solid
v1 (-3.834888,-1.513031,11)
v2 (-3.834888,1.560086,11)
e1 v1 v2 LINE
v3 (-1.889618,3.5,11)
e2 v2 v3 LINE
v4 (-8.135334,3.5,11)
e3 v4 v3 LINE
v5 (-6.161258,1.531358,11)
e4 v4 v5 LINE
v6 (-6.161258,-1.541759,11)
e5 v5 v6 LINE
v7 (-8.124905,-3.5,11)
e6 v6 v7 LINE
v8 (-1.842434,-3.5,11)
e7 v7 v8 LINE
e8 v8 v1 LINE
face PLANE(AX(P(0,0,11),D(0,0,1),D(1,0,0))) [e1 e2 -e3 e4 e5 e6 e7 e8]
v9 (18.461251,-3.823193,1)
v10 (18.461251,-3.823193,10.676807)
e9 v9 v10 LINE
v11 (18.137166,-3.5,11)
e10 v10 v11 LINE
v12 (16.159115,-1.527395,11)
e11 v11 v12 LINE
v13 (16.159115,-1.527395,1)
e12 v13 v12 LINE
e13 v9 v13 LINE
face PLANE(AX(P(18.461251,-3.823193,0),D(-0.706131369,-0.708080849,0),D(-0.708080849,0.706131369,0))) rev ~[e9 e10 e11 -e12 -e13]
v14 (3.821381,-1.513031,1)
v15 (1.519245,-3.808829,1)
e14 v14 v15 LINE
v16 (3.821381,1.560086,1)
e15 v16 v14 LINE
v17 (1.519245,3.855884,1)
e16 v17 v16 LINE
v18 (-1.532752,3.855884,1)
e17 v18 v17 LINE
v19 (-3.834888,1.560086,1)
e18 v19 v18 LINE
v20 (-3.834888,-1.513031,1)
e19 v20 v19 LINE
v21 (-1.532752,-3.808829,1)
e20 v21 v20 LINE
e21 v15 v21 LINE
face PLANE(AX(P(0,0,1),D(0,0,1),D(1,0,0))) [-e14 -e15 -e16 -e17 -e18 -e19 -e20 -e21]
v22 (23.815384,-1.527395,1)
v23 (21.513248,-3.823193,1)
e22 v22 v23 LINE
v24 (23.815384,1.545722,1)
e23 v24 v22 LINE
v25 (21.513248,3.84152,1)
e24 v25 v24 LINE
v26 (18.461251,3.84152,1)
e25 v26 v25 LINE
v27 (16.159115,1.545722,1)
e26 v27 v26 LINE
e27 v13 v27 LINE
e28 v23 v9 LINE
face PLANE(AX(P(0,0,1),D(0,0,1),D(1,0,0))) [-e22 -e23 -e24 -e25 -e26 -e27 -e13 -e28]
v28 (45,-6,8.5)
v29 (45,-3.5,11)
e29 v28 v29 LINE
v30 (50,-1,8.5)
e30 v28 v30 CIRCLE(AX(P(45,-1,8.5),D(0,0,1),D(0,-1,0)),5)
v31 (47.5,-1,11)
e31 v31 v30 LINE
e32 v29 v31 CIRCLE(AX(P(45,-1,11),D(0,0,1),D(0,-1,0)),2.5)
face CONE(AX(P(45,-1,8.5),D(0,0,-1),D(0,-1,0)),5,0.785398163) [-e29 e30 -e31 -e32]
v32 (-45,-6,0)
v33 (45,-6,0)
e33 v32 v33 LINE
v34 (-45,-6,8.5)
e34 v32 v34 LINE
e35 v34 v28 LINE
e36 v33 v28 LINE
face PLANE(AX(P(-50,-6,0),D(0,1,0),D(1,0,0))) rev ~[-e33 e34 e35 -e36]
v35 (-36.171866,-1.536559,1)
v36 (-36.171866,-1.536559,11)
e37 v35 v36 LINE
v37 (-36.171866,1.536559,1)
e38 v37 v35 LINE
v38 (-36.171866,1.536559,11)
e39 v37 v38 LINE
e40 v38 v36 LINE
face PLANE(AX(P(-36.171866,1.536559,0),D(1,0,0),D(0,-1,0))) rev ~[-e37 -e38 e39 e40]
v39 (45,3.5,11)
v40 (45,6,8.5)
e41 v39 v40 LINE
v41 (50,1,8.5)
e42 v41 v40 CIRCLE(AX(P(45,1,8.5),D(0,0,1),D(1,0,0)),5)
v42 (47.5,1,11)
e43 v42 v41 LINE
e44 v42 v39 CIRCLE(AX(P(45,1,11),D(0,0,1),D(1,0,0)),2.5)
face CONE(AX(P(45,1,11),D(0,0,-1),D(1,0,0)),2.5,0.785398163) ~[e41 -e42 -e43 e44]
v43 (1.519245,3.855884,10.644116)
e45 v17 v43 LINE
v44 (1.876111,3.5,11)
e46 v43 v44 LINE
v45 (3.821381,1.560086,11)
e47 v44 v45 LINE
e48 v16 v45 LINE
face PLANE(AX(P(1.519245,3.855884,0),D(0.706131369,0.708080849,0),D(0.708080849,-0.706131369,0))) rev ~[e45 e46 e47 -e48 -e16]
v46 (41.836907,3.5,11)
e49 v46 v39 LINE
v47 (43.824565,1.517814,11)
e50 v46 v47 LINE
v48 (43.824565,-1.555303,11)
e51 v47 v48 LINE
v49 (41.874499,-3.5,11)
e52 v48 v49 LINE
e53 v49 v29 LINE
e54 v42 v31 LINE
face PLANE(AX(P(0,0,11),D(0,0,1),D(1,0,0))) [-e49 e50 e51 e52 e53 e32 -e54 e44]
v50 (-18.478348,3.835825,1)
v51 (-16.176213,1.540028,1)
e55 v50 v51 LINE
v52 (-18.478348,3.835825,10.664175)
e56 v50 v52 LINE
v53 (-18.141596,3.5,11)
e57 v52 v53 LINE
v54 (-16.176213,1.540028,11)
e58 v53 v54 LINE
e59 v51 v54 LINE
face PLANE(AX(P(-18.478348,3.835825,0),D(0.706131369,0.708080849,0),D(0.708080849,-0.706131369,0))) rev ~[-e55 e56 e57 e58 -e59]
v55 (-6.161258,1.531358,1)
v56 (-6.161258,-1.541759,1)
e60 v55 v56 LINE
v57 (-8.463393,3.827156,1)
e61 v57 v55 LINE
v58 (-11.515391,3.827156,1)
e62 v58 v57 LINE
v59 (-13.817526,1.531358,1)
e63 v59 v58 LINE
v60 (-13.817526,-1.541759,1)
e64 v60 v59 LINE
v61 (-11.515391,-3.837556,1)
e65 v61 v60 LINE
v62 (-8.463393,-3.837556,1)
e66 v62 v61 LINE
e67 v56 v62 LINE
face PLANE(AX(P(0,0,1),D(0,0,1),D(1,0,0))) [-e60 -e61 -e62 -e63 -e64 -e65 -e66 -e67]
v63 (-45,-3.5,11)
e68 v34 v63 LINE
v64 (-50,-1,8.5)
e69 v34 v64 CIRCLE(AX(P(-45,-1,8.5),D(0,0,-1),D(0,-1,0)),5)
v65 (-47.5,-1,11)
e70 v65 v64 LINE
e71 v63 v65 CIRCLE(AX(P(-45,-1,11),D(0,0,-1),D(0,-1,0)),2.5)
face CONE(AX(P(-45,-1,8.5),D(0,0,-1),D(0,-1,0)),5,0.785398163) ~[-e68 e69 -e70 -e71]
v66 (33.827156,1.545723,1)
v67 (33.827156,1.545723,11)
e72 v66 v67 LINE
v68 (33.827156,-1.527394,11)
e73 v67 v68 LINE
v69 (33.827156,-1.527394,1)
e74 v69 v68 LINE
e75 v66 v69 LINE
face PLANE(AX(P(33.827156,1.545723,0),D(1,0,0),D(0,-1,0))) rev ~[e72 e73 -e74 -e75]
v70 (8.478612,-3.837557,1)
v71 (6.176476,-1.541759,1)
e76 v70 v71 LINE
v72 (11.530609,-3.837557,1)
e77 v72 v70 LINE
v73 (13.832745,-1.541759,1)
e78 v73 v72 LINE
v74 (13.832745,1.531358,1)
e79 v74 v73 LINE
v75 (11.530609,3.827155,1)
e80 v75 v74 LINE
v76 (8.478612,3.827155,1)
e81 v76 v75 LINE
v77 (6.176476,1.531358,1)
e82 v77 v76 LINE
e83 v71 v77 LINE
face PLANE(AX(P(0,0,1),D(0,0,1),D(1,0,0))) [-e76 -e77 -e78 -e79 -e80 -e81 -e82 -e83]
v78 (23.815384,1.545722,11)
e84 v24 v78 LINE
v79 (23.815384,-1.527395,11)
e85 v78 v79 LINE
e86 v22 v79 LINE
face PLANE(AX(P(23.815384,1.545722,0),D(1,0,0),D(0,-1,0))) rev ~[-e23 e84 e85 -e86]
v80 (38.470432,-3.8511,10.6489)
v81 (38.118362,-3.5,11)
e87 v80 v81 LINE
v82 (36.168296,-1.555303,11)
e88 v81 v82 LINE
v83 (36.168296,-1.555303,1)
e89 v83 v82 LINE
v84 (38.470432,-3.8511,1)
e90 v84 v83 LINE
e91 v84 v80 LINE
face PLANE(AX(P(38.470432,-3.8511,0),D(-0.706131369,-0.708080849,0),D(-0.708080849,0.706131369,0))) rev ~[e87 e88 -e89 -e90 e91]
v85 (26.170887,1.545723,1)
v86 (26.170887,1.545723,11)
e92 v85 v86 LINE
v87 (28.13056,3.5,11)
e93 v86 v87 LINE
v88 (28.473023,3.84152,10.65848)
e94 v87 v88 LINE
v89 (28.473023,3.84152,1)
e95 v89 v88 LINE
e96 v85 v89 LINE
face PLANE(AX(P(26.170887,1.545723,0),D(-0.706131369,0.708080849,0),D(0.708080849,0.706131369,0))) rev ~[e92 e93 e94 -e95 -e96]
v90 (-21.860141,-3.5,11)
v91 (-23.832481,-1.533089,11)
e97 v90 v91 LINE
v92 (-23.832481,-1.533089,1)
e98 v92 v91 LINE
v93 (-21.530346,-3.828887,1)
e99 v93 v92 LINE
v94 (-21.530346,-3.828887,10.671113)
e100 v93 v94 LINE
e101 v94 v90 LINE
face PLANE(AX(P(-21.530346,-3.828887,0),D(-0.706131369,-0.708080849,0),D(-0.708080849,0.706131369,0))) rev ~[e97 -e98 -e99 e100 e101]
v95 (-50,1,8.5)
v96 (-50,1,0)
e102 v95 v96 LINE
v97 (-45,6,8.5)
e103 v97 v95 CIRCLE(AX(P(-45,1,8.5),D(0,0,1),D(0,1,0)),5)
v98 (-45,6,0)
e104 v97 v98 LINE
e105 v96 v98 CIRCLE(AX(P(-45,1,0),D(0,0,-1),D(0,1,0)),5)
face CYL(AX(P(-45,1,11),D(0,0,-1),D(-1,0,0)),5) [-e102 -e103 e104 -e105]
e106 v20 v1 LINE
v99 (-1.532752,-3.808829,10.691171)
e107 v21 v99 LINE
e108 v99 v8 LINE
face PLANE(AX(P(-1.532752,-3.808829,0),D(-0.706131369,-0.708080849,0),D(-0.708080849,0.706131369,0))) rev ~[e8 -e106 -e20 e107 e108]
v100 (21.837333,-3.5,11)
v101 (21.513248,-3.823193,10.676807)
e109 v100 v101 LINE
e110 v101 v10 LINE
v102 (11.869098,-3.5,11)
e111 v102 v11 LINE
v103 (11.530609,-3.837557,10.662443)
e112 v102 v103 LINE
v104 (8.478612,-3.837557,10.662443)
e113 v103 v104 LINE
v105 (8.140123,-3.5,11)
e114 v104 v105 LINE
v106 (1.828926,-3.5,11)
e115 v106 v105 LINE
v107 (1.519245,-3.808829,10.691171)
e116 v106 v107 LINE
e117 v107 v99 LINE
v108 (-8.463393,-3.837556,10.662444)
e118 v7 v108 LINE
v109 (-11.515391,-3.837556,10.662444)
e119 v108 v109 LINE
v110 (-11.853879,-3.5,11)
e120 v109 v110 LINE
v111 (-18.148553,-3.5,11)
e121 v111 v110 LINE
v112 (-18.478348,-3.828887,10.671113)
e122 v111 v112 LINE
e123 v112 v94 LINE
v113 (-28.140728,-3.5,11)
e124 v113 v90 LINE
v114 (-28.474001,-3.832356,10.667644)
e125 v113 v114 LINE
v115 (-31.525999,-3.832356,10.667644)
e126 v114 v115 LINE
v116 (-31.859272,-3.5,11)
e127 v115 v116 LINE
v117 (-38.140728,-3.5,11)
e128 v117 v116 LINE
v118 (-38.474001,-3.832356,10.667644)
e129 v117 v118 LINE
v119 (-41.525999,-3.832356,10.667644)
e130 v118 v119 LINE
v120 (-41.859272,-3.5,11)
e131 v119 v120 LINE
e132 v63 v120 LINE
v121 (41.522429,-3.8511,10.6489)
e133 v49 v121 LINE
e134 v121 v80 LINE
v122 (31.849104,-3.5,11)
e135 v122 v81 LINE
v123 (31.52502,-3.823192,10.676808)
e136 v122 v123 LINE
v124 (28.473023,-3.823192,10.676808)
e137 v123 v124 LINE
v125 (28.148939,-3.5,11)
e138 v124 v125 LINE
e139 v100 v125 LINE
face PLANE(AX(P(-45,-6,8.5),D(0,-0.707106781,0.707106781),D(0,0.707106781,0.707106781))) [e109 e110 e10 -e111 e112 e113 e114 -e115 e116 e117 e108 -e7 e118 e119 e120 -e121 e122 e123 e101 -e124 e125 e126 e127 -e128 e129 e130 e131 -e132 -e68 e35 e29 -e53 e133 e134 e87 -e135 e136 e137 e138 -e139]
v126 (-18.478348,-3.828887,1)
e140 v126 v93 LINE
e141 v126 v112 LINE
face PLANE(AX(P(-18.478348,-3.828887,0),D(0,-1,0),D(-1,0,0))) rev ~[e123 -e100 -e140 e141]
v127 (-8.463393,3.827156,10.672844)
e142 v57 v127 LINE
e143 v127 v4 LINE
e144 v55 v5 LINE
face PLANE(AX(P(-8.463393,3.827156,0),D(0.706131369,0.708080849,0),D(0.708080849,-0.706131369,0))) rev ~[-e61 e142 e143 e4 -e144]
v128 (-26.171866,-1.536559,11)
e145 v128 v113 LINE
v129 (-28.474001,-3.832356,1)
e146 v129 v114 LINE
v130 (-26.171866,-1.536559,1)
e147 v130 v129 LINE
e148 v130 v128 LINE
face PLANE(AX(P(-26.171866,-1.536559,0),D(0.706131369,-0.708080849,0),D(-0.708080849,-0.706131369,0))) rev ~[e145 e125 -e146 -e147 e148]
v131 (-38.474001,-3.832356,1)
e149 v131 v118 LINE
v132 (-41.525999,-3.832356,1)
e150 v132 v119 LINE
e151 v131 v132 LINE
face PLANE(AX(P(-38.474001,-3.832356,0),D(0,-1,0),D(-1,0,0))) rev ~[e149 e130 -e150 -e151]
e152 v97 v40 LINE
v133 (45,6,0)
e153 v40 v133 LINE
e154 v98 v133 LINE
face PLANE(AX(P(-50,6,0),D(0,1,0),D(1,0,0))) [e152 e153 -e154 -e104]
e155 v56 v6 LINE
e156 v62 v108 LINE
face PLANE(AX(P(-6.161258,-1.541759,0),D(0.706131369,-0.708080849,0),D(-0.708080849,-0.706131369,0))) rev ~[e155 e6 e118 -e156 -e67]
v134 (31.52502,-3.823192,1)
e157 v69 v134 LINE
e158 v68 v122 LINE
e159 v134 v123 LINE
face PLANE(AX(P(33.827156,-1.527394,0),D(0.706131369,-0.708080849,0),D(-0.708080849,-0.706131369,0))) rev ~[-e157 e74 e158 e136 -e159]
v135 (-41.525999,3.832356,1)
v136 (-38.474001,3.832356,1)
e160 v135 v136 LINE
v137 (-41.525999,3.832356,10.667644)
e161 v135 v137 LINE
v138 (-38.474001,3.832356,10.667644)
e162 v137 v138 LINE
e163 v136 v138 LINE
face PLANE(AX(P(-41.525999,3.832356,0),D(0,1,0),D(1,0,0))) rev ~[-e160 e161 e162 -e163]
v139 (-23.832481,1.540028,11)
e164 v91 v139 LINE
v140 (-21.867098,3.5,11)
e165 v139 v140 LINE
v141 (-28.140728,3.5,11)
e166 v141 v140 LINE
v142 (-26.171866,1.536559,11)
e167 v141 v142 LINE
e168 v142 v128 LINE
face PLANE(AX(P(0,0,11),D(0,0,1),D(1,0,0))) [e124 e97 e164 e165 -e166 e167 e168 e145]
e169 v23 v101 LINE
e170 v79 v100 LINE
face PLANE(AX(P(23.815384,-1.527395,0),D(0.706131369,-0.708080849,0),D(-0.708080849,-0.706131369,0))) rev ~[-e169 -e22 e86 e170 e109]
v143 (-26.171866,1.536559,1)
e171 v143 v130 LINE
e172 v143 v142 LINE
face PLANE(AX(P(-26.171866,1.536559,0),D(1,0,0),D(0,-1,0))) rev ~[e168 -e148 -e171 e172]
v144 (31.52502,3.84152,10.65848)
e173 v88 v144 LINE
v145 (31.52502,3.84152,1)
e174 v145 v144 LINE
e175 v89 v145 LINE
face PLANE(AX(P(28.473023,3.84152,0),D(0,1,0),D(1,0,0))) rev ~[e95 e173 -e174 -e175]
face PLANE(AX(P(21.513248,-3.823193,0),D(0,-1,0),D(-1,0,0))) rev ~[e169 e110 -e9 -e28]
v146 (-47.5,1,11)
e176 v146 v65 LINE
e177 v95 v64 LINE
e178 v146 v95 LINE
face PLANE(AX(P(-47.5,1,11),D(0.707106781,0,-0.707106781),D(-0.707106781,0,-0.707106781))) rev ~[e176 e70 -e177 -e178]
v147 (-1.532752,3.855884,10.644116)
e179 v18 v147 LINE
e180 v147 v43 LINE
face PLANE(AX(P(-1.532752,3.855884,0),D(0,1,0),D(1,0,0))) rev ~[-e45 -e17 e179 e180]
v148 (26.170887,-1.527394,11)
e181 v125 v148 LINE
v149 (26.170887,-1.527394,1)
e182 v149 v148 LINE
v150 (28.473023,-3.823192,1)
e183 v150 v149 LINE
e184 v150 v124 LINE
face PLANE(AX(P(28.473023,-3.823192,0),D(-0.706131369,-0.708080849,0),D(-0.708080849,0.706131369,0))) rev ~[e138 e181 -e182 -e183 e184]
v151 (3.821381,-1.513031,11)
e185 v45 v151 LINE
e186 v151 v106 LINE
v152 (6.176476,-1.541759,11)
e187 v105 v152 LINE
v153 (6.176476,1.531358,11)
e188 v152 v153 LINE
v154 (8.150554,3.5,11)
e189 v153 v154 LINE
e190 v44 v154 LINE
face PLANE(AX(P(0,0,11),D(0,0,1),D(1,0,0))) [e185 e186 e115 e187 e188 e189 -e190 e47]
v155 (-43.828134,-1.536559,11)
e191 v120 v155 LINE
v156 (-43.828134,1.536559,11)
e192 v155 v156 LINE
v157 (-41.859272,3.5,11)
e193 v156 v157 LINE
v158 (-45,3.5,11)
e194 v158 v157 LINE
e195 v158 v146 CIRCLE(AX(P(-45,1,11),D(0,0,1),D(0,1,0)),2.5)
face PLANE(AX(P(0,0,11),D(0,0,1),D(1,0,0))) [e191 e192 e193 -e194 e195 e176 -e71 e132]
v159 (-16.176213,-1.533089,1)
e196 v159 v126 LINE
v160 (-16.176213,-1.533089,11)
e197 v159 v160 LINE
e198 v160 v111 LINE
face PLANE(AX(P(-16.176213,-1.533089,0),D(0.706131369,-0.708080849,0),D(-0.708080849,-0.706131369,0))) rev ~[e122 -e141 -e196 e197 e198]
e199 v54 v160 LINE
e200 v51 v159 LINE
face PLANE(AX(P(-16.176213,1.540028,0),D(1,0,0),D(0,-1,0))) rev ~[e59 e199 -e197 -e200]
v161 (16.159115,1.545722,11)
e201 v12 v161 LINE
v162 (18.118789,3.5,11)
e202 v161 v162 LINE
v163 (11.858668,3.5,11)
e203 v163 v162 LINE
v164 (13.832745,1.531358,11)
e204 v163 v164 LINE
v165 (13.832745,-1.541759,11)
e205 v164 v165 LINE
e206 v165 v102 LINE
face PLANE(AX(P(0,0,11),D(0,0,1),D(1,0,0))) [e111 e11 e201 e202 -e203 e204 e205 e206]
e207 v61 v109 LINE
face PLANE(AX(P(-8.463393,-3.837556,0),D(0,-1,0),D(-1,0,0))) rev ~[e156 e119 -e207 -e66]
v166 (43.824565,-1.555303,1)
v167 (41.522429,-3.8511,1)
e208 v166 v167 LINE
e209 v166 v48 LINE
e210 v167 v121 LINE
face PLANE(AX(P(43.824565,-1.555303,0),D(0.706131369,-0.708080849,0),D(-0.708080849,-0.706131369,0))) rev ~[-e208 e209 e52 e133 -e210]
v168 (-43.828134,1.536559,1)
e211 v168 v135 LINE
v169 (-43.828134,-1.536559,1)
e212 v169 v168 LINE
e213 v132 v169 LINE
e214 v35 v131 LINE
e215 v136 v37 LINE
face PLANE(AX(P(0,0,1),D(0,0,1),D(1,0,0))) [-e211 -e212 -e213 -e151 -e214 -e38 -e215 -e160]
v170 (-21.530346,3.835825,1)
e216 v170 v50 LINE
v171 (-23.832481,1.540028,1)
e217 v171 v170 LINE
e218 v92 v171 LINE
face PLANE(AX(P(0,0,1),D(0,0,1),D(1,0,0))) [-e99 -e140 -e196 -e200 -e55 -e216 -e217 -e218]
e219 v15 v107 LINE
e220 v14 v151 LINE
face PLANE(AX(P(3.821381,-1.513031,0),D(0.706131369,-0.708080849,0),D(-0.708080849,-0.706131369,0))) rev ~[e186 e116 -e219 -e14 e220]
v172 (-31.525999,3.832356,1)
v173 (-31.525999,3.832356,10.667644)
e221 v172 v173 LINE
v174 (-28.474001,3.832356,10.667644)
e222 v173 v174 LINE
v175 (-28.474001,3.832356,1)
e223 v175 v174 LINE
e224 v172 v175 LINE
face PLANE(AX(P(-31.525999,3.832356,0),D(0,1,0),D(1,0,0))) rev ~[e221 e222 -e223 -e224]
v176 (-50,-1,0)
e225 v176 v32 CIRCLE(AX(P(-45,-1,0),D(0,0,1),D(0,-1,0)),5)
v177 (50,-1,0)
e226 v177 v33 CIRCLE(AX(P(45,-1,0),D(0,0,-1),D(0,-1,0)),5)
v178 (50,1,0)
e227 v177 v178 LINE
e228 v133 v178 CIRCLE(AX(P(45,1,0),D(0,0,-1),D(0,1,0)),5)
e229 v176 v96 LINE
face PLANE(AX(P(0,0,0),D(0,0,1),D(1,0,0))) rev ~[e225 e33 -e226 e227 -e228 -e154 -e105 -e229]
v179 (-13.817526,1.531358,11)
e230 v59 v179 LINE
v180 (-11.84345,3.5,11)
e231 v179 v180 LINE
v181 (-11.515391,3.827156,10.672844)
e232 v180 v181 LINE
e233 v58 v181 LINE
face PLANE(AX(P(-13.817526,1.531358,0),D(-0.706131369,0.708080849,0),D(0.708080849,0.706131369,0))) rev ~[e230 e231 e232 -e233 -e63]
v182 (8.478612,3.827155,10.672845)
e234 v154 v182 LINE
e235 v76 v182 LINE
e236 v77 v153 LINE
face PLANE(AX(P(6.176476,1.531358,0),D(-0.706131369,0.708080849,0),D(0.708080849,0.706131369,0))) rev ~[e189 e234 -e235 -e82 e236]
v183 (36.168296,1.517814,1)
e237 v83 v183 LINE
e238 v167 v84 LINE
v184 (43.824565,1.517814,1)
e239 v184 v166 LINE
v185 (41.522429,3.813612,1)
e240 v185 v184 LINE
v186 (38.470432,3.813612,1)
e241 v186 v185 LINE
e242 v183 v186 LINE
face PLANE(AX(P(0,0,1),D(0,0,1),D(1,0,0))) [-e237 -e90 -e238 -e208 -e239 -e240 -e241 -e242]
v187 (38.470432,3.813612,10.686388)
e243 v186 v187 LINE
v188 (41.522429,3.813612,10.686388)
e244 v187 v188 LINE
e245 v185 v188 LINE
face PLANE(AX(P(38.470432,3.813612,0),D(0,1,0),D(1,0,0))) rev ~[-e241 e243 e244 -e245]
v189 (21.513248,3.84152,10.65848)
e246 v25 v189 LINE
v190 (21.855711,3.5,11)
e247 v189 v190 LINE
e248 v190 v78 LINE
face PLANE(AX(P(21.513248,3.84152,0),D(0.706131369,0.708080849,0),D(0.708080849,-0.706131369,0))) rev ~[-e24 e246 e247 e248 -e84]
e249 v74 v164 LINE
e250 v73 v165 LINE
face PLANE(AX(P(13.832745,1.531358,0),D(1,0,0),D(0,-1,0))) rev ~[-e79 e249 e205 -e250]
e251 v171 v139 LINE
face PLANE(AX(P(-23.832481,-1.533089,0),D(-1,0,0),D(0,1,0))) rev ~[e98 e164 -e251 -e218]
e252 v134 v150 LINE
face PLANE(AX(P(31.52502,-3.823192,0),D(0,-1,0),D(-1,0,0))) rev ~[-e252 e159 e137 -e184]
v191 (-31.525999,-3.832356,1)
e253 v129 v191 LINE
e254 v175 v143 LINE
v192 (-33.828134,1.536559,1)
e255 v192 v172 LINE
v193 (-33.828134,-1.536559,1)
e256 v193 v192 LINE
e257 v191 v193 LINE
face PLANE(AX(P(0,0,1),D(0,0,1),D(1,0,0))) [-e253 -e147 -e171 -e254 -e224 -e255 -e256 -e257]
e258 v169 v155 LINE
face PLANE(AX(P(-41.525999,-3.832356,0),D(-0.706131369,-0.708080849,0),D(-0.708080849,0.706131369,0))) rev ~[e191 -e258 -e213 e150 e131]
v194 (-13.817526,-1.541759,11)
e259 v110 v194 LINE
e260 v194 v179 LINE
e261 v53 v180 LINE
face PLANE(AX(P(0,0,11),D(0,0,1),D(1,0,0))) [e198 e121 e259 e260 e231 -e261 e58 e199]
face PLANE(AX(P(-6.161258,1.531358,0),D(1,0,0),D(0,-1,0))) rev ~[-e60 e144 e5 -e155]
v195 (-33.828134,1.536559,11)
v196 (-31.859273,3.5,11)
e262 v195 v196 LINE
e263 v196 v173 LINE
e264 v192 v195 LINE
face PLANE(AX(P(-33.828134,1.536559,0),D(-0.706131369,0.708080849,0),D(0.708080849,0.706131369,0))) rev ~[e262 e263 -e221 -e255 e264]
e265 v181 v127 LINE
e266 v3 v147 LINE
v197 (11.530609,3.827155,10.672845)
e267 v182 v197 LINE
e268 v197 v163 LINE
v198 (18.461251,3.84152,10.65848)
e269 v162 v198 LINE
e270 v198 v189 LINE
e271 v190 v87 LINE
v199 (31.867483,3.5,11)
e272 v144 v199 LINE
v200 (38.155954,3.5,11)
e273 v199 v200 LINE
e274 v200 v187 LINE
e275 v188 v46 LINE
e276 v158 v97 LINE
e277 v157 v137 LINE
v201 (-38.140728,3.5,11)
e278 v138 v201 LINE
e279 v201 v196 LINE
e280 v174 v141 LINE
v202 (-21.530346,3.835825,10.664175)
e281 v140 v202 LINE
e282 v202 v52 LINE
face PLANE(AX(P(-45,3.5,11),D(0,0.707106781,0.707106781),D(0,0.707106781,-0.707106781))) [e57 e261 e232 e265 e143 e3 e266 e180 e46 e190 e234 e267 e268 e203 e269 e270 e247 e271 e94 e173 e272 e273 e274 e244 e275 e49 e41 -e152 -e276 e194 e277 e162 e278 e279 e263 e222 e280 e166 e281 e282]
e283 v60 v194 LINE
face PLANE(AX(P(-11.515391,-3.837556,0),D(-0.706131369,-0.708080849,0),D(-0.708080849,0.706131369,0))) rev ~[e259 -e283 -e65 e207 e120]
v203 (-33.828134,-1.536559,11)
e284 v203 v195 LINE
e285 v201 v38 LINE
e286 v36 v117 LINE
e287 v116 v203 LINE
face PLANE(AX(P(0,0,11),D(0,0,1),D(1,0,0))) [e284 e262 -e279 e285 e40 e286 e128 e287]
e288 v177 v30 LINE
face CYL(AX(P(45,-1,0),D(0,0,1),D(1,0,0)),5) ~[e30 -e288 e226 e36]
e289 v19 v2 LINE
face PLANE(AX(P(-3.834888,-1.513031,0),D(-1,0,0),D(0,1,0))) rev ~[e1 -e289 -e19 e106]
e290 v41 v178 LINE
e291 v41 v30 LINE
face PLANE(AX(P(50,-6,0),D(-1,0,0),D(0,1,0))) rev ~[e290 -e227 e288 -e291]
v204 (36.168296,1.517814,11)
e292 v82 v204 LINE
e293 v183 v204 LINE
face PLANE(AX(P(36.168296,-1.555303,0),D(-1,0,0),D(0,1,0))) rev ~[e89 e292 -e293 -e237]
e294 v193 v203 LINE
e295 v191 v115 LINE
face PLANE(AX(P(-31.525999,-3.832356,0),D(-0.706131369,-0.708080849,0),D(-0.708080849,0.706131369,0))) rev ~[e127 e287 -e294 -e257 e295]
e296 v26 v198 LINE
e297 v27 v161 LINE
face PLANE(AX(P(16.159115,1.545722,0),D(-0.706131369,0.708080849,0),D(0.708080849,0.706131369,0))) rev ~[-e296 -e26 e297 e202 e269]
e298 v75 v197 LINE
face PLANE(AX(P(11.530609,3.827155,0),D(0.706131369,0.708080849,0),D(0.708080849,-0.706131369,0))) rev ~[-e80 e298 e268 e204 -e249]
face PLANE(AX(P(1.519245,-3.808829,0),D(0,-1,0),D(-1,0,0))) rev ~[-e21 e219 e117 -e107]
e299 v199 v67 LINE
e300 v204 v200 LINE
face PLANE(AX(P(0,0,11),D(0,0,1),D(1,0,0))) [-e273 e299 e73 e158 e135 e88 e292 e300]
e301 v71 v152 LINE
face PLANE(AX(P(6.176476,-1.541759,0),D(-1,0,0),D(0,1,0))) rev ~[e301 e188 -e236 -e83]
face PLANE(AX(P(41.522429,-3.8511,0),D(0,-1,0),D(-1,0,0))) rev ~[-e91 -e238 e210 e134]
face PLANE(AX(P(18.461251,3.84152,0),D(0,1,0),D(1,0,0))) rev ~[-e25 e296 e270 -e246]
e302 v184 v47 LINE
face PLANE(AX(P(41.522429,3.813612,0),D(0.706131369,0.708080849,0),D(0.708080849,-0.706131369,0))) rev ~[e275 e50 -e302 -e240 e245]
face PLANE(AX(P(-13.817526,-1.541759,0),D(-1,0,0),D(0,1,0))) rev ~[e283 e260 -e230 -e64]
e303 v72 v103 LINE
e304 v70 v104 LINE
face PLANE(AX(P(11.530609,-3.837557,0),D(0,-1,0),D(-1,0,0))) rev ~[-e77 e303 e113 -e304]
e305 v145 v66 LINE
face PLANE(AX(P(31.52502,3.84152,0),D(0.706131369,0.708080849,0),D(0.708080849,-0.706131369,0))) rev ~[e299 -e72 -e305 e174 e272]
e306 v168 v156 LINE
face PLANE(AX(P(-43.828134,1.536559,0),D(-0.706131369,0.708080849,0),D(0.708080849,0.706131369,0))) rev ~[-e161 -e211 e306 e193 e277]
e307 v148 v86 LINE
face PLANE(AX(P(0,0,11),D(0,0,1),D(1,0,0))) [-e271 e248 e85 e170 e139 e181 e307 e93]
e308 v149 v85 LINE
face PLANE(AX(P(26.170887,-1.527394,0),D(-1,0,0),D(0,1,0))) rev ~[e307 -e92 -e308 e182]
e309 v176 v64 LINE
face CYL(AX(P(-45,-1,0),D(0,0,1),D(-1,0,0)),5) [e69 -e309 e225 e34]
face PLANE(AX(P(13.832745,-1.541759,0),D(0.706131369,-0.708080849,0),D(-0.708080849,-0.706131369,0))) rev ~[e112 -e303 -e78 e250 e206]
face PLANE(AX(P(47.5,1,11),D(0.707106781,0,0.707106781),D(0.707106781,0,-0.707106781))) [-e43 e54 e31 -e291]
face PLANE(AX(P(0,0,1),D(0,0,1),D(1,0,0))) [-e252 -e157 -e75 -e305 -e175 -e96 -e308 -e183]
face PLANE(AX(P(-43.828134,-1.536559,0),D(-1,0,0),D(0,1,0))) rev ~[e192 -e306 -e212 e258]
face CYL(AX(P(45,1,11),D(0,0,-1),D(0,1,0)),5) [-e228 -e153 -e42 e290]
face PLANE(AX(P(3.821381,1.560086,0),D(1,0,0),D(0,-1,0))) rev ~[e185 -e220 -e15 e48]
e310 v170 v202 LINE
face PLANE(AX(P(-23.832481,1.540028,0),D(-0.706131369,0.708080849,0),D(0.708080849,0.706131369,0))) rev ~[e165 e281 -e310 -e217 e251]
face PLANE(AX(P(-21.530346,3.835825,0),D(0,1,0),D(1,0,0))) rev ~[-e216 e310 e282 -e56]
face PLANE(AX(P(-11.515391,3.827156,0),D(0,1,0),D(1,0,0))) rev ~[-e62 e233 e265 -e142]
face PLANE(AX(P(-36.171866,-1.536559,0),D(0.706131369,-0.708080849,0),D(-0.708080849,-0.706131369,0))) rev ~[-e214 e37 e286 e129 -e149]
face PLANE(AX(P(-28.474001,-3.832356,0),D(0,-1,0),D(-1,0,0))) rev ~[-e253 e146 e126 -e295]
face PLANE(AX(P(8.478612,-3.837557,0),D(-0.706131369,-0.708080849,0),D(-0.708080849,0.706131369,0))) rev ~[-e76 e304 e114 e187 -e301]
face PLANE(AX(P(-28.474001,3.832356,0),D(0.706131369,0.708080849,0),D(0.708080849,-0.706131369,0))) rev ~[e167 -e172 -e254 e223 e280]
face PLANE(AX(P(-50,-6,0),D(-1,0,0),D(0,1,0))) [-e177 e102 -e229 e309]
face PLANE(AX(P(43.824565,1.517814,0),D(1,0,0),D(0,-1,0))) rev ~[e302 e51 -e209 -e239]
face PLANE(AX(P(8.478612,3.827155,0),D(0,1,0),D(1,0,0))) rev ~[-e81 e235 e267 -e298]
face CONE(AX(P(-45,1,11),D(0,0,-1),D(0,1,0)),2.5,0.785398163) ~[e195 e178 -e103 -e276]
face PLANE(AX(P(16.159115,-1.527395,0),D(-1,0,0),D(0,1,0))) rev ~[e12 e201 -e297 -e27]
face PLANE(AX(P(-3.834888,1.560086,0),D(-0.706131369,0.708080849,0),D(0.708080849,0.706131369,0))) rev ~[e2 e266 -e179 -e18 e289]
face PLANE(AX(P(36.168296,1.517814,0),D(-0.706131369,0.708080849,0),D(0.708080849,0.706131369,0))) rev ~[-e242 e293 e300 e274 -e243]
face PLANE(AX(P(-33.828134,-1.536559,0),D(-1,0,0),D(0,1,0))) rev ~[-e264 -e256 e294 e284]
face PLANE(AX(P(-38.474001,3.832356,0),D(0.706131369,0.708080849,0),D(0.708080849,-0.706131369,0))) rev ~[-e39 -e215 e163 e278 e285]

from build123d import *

# Parameters (mm, degrees)
F0_W         = 100
F0_H         = 12
F1_DEPTH     = 11
F0_W_2       = 2.3021356216
F0_H_2       = 3.0731172886
F0_W_3       = 3.0519974387
F0_H_3       = 2.2957974076
F2_DEPTH     = 1
F3_R         = 5
F4_T1_DEPTH  = 90
F4_T3_DEPTH  = 2
F4_T6_ANGLE  = 90
F4_T8_ANGLE  = 90
F4_T10_ANGLE = 90
F4_T12_ANGLE = 90


# Not quite as in the source:
# - a fillet or chamfer that OpenCascade refuses, or shapes differently, is made with other operations: its cross-section is extruded or revolved along the edge and cut away or added


with BuildPart() as f1:
    # F0 (on Top) → F1 (new body)
    with BuildSketch(Plane.XY):
        Rectangle(F0_W, F0_H)
        Polygon((-43.828134341, 1.5365586443), (-41.5259987194, 3.8323560519), (-38.4740012806, 3.8323560519), (-36.171865659, 1.5365586443), (-36.171865659, -1.5365586443), (-38.4740012806, -3.8323560519), (-41.5259987194, -3.8323560519), (-43.828134341, -1.5365586443), align=None, mode=Mode.SUBTRACT)
        Polygon((-13.8175263533, 1.5313583214), (-11.5153907317, 3.827155729), (-8.463393293, 3.827155729), (-6.1612576714, 1.5313583214), (-6.1612576714, -1.5417589672), (-8.463393293, -3.8375563748), (-11.5153907317, -3.8375563748), (-13.8175263533, -1.5417589672), align=None, mode=Mode.SUBTRACT)
        Polygon((6.1764764136, 1.531357914), (8.4786120352, 3.8271553215), (11.5306094739, 3.8271553215), (13.8327450955, 1.531357914), (13.8327450955, -1.5417593747), (11.5306094739, -3.8375567823), (8.4786120352, -3.8375567823), (6.1764764136, -1.5417593747), align=None, mode=Mode.SUBTRACT)
        Polygon((36.1682959368, 1.5178143587), (38.4704315585, 3.8136117663), (41.5224289972, 3.8136117663), (43.8245646188, 1.5178143587), (43.8245646188, -1.5553029299), (41.5224289972, -3.8511003375), (38.4704315585, -3.8511003375), (36.1682959368, -1.5553029299), align=None, mode=Mode.SUBTRACT)
        Polygon((-33.8281344609, 1.5365587602), (-31.5259988393, 3.8323561678), (-28.4740014006, 3.8323561678), (-26.1718657789, 1.5365587602), (-26.1718657789, -1.5365585284), (-28.4740014006, -3.832355936), (-31.5259988393, -3.832355936), (-33.8281344609, -1.5365585284), align=None, mode=Mode.SUBTRACT)
        Polygon((-23.8324813077, 1.5400278102), (-21.5303456861, 3.8358252178), (-18.4783482474, 3.8358252178), (-16.1762126258, 1.5400278102), (-16.1762126258, -1.5330894784), (-18.4783482474, -3.828886886), (-21.5303456861, -3.828886886), (-23.8324813077, -1.5330894784), align=None, mode=Mode.SUBTRACT)
        Polygon((-3.8348879394, 1.5600861226), (-1.5327523178, 3.8558835302), (1.5192451209, 3.8558835302), (3.8213807426, 1.5600861226), (3.8213807426, -1.513031166), (1.5192451209, -3.8088285736), (-1.5327523178, -3.8088285736), (-3.8348879394, -1.513031166), align=None, mode=Mode.SUBTRACT)
        Polygon((16.1591154059, 1.5457221845), (18.4612510276, 3.8415195921), (21.5132484663, 3.8415195921), (23.8153840879, 1.5457221845), (23.8153840879, -1.5273951041), (21.5132484663, -3.8231925117), (18.4612510276, -3.8231925117), (16.1591154059, -1.5273951041), align=None, mode=Mode.SUBTRACT)
        Polygon((26.1708870998, 1.5457229285), (28.4730227214, 3.8415203361), (31.5250201601, 3.8415203361), (33.8271557817, 1.5457229285), (33.8271557817, -1.5273943601), (31.5250201601, -3.8231917677), (28.4730227214, -3.8231917677), (26.1708870998, -1.5273943601), align=None, mode=Mode.SUBTRACT)
    extrude(amount=F1_DEPTH)

    # F0 (on Top) → F2 (join)
    with BuildSketch(Plane.XY):
        Rectangle(F0_W, F0_H)
        Polygon((-43.828134341, 1.5365586443), (-41.5259987194, 3.8323560519), (-38.4740012806, 3.8323560519), (-36.171865659, 1.5365586443), (-36.171865659, -1.5365586443), (-38.4740012806, -3.8323560519), (-41.5259987194, -3.8323560519), (-43.828134341, -1.5365586443), align=None, mode=Mode.SUBTRACT)
        Polygon((-13.8175263533, 1.5313583214), (-11.5153907317, 3.827155729), (-8.463393293, 3.827155729), (-6.1612576714, 1.5313583214), (-6.1612576714, -1.5417589672), (-8.463393293, -3.8375563748), (-11.5153907317, -3.8375563748), (-13.8175263533, -1.5417589672), align=None, mode=Mode.SUBTRACT)
        Polygon((6.1764764136, 1.531357914), (8.4786120352, 3.8271553215), (11.5306094739, 3.8271553215), (13.8327450955, 1.531357914), (13.8327450955, -1.5417593747), (11.5306094739, -3.8375567823), (8.4786120352, -3.8375567823), (6.1764764136, -1.5417593747), align=None, mode=Mode.SUBTRACT)
        Polygon((36.1682959368, 1.5178143587), (38.4704315585, 3.8136117663), (41.5224289972, 3.8136117663), (43.8245646188, 1.5178143587), (43.8245646188, -1.5553029299), (41.5224289972, -3.8511003375), (38.4704315585, -3.8511003375), (36.1682959368, -1.5553029299), align=None, mode=Mode.SUBTRACT)
        Polygon((-33.8281344609, 1.5365587602), (-31.5259988393, 3.8323561678), (-28.4740014006, 3.8323561678), (-26.1718657789, 1.5365587602), (-26.1718657789, -1.5365585284), (-28.4740014006, -3.832355936), (-31.5259988393, -3.832355936), (-33.8281344609, -1.5365585284), align=None, mode=Mode.SUBTRACT)
        Polygon((-23.8324813077, 1.5400278102), (-21.5303456861, 3.8358252178), (-18.4783482474, 3.8358252178), (-16.1762126258, 1.5400278102), (-16.1762126258, -1.5330894784), (-18.4783482474, -3.828886886), (-21.5303456861, -3.828886886), (-23.8324813077, -1.5330894784), align=None, mode=Mode.SUBTRACT)
        Polygon((-3.8348879394, 1.5600861226), (-1.5327523178, 3.8558835302), (1.5192451209, 3.8558835302), (3.8213807426, 1.5600861226), (3.8213807426, -1.513031166), (1.5192451209, -3.8088285736), (-1.5327523178, -3.8088285736), (-3.8348879394, -1.513031166), align=None, mode=Mode.SUBTRACT)
        Polygon((16.1591154059, 1.5457221845), (18.4612510276, 3.8415195921), (21.5132484663, 3.8415195921), (23.8153840879, 1.5457221845), (23.8153840879, -1.5273951041), (21.5132484663, -3.8231925117), (18.4612510276, -3.8231925117), (16.1591154059, -1.5273951041), align=None, mode=Mode.SUBTRACT)
        Polygon((26.1708870998, 1.5457229285), (28.4730227214, 3.8415203361), (31.5250201601, 3.8415203361), (33.8271557817, 1.5457229285), (33.8271557817, -1.5273943601), (31.5250201601, -3.8231917677), (28.4730227214, -3.8231917677), (26.1708870998, -1.5273943601), align=None, mode=Mode.SUBTRACT)
        with Locations((-42.6770665302, 0)):
            Rectangle(F0_W_2, F0_H_2)
        Polygon((-41.5259987194, 1.5365586443), (-41.5259987194, 3.8323560519), (-43.828134341, 1.5365586443), align=None)
        with Locations((-40, 2.6844573481)):
            Rectangle(F0_W_3, F0_H_3)
        Polygon((-41.5259987194, -3.8323560519), (-41.5259987194, -1.5365586443), (-43.828134341, -1.5365586443), align=None)
        with Locations((-40, -2.6844573481)):
            Rectangle(F0_W_3, F0_H_3)
        with Locations((-40, 0)):
            Rectangle(F0_W_3, F0_H_2)
        with Locations((-37.3229334698, 0)):
            Rectangle(F0_W_2, F0_H_2)
        Polygon((-36.171865659, 1.5365586443), (-38.4740012806, 3.8323560519), (-38.4740012806, 1.5365586443), align=None)
        Polygon((-36.171865659, -1.5365586443), (-38.4740012806, -1.5365586443), (-38.4740012806, -3.8323560519), align=None)
        Polygon((-31.5259988393, -3.832355936), (-31.5259988393, -1.5365585284), (-33.8281344609, -1.5365585284), align=None)
        with Locations((-32.6770666501, 1.159e-07)):
            Rectangle(F0_W_2, F0_H_2)
        Polygon((-31.5259988393, 1.5365587602), (-31.5259988393, 3.8323561678), (-33.8281344609, 1.5365587602), align=None)
        with Locations((-30.0000001199, 2.684457464)):
            Rectangle(F0_W_3, F0_H_3)
        Polygon((-26.1718657789, 1.5365587602), (-28.4740014006, 3.8323561678), (-28.4740014006, 1.5365587602), align=None)
        with Locations((-27.3229335898, 1.159e-07)):
            Rectangle(F0_W_2, F0_H_2)
        with Locations((-30.0000001199, 1.159e-07)):
            Rectangle(F0_W_3, F0_H_2)
        with Locations((-30.0000001199, -2.6844572322)):
            Rectangle(F0_W_3, F0_H_3)
        Polygon((-26.1718657789, -1.5365585284), (-28.4740014006, -1.5365585284), (-28.4740014006, -3.832355936), align=None)
        Polygon((-21.5303456861, -3.828886886), (-21.5303456861, -1.5330894784), (-23.8324813077, -1.5330894784), align=None)
        with Locations((-22.6814134969, 0.0034691659)):
            Rectangle(F0_W_2, F0_H_2)
        Polygon((-21.5303456861, 1.5400278102), (-21.5303456861, 3.8358252178), (-23.8324813077, 1.5400278102), align=None)
        with Locations((-20.0043469667, 2.687926514)):
            Rectangle(F0_W_3, F0_H_3)
        with Locations((-20.0043469667, 0.0034691659)):
            Rectangle(F0_W_3, F0_H_2)
        with Locations((-20.0043469667, -2.6809881822)):
            Rectangle(F0_W_3, F0_H_3)
        Polygon((-16.1762126258, -1.5330894784), (-18.4783482474, -1.5330894784), (-18.4783482474, -3.828886886), align=None)
        with Locations((-17.3272804366, 0.0034691659)):
            Rectangle(F0_W_2, F0_H_2)
        Polygon((-16.1762126258, 1.5400278102), (-18.4783482474, 3.8358252178), (-18.4783482474, 1.5400278102), align=None)
        Polygon((-11.5153907317, 1.5313583214), (-11.5153907317, 3.827155729), (-13.8175263533, 1.5313583214), align=None)
        with Locations((-12.6664585425, -0.0052003229)):
            Rectangle(F0_W_2, F0_H_2)
        Polygon((-11.5153907317, -3.8375563748), (-11.5153907317, -1.5417589672), (-13.8175263533, -1.5417589672), align=None)
        with Locations((-9.9893920124, -2.689657671)):
            Rectangle(F0_W_3, F0_H_3)
        with Locations((-9.9893920124, 2.6792570252)):
            Rectangle(F0_W_3, F0_H_3)
        with Locations((-7.3123254822, -0.0052003229)):
            Rectangle(F0_W_2, F0_H_2)
        Polygon((-6.1612576714, 1.5313583214), (-8.463393293, 3.827155729), (-8.463393293, 1.5313583214), align=None)
        Polygon((-6.1612576714, -1.5417589672), (-8.463393293, -1.5417589672), (-8.463393293, -3.8375563748), align=None)
        with Locations((-9.9893920124, -0.0052003229)):
            Rectangle(F0_W_3, F0_H_2)
        Polygon((-1.5327523178, 1.5600861226), (-1.5327523178, 3.8558835302), (-3.8348879394, 1.5600861226), align=None)
        with Locations((-0.0067535984, 2.7079848264)):
            Rectangle(F0_W_3, F0_H_3)
        Polygon((3.8213807426, 1.5600861226), (1.5192451209, 3.8558835302), (1.5192451209, 1.5600861226), align=None)
        with Locations((2.6703129317, 0.0235274783)):
            Rectangle(F0_W_2, F0_H_2)
        with Locations((-0.0067535984, 0.0235274783)):
            Rectangle(F0_W_3, F0_H_2)
        with Locations((-2.6838201286, 0.0235274783)):
            Rectangle(F0_W_2, F0_H_2)
        with Locations((-0.0067535984, -2.6609298698)):
            Rectangle(F0_W_3, F0_H_3)
        Polygon((3.8213807426, -1.513031166), (1.5192451209, -1.513031166), (1.5192451209, -3.8088285736), align=None)
        Polygon((-1.5327523178, -3.8088285736), (-1.5327523178, -1.513031166), (-3.8348879394, -1.513031166), align=None)
        with Locations((7.3275442244, -0.0052007304)):
            Rectangle(F0_W_2, F0_H_2)
        Polygon((8.4786120352, 1.531357914), (8.4786120352, 3.8271553215), (6.1764764136, 1.531357914), align=None)
        with Locations((10.0046107545, 2.6792566177)):
            Rectangle(F0_W_3, F0_H_3)
        Polygon((13.8327450955, 1.531357914), (11.5306094739, 3.8271553215), (11.5306094739, 1.531357914), align=None)
        with Locations((12.6816772847, -0.0052007304)):
            Rectangle(F0_W_2, F0_H_2)
        with Locations((10.0046107545, -0.0052007304)):
            Rectangle(F0_W_3, F0_H_2)
        Polygon((8.4786120352, -3.8375567823), (8.4786120352, -1.5417593747), (6.1764764136, -1.5417593747), align=None)
        with Locations((10.0046107545, -2.6896580785)):
            Rectangle(F0_W_3, F0_H_3)
        Polygon((13.8327450955, -1.5417593747), (11.5306094739, -1.5417593747), (11.5306094739, -3.8375567823), align=None)
        with Locations((17.3101832167, 0.0091635402)):
            Rectangle(F0_W_2, F0_H_2)
        Polygon((18.4612510276, -3.8231925117), (18.4612510276, -1.5273951041), (16.1591154059, -1.5273951041), align=None)
        with Locations((19.9872497469, -2.6752938079)):
            Rectangle(F0_W_3, F0_H_3)
        Polygon((23.8153840879, -1.5273951041), (21.5132484663, -1.5273951041), (21.5132484663, -3.8231925117), align=None)
        with Locations((22.6643162771, 0.0091635402)):
            Rectangle(F0_W_2, F0_H_2)
        with Locations((19.9872497469, 0.0091635402)):
            Rectangle(F0_W_3, F0_H_2)
        with Locations((19.9872497469, 2.6936208883)):
            Rectangle(F0_W_3, F0_H_3)
        Polygon((18.4612510276, 1.5457221845), (18.4612510276, 3.8415195921), (16.1591154059, 1.5457221845), align=None)
        Polygon((23.8153840879, 1.5457221845), (21.5132484663, 3.8415195921), (21.5132484663, 1.5457221845), align=None)
        Polygon((28.4730227214, 1.5457229285), (28.4730227214, 3.8415203361), (26.1708870998, 1.5457229285), align=None)
        with Locations((27.3219549106, 0.0091642842)):
            Rectangle(F0_W_2, F0_H_2)
        Polygon((28.4730227214, -3.8231917677), (28.4730227214, -1.5273943601), (26.1708870998, -1.5273943601), align=None)
        with Locations((29.9990214407, -2.6752930639)):
            Rectangle(F0_W_3, F0_H_3)
        with Locations((29.9990214407, 0.0091642842)):
            Rectangle(F0_W_3, F0_H_2)
        with Locations((29.9990214407, 2.6936216323)):
            Rectangle(F0_W_3, F0_H_3)
        Polygon((33.8271557817, 1.5457229285), (31.5250201601, 3.8415203361), (31.5250201601, 1.5457229285), align=None)
        with Locations((32.6760879709, 0.0091642842)):
            Rectangle(F0_W_2, F0_H_2)
        Polygon((33.8271557817, -1.5273943601), (31.5250201601, -1.5273943601), (31.5250201601, -3.8231917677), align=None)
        with Locations((37.3193637477, -0.0187442856)):
            Rectangle(F0_W_2, F0_H_2)
        Polygon((38.4704315585, -3.8511003375), (38.4704315585, -1.5553029299), (36.1682959368, -1.5553029299), align=None)
        with Locations((39.9964302778, -2.7032016337)):
            Rectangle(F0_W_3, F0_H_3)
        with Locations((42.673496808, -0.0187442856)):
            Rectangle(F0_W_2, F0_H_2)
        with Locations((39.9964302778, 2.6657130625)):
            Rectangle(F0_W_3, F0_H_3)
        Polygon((38.4704315585, 1.5178143587), (38.4704315585, 3.8136117663), (36.1682959368, 1.5178143587), align=None)
        with Locations((39.9964302778, -0.0187442856)):
            Rectangle(F0_W_3, F0_H_2)
        Polygon((43.8245646188, 1.5178143587), (41.5224289972, 3.8136117663), (41.5224289972, 1.5178143587), align=None)
        Polygon((43.8245646188, -1.5553029299), (41.5224289972, -1.5553029299), (41.5224289972, -3.8511003375), align=None)
    extrude(amount=F2_DEPTH)

    # F3
    f3_edges = [f1.edges().sort_by_distance(p)[0] for p in [
        (-50, 6, 5.5),
        (50, -6, 5.5),
        (50, 6, 5.5),
        (-50, -6, 5.5),
    ]]
    fillet(f3_edges, radius=F3_R)

    # F4: chamfer of 2.5 on 8 edges, made by hand

    # F4_s2 → F4_t1 (cut)
    with BuildSketch(Plane.YZ.offset(-45)):
        Polygon((-6, 8.5), (-3.5, 11), (-6, 11), align=None)
        Polygon((3.5, 11), (6, 8.5), (6, 11), align=None)
    extrude(amount=F4_T1_DEPTH, mode=Mode.SUBTRACT)

    # F4_s4 → F4_t3 (cut)
    with BuildSketch(Plane.XZ.offset(-1)):
        Polygon((-47.5, 11), (-50, 8.5), (-50, 11), align=None)
        Polygon((47.5, 11), (50, 8.5), (50, 11), align=None)
    extrude(amount=F4_T3_DEPTH, mode=Mode.SUBTRACT)

    # F4_s5 → F4_t6 (revolve, cut)
    with BuildSketch(Plane.YZ.offset(-45)):
        Polygon((-6, 8.5), (-3.5, 11), (-6, 11), align=None)
    revolve(axis=Axis((-45, -1, 11), (0, 0, -1)), revolution_arc=F4_T6_ANGLE, mode=Mode.SUBTRACT)

    # F4_s7 → F4_t8 (revolve, cut)
    with BuildSketch(Plane.YZ.offset(45)):
        Polygon((-6, 8.5), (-3.5, 11), (-6, 11), align=None)
    revolve(axis=Axis((45, -1, 11), (0, 0, 1)), revolution_arc=F4_T8_ANGLE, mode=Mode.SUBTRACT)

    # F4_s9 → F4_t10 (revolve, cut)
    with BuildSketch(Plane.YZ.offset(-45)):
        Polygon((3.5, 11), (6, 8.5), (6, 11), align=None)
    revolve(axis=Axis((-45, 1, 11), (0, 0, 1)), revolution_arc=F4_T10_ANGLE, mode=Mode.SUBTRACT)

    # F4_s11 → F4_t12 (revolve, cut)
    with BuildSketch(Plane.XZ.offset(-1)):
        Polygon((47.5, 11), (50, 8.5), (50, 11), align=None)
    revolve(axis=Axis((45, 1, 11), (0, 0, 1)), revolution_arc=F4_T12_ANGLE, mode=Mode.SUBTRACT)


solid = f1.part
